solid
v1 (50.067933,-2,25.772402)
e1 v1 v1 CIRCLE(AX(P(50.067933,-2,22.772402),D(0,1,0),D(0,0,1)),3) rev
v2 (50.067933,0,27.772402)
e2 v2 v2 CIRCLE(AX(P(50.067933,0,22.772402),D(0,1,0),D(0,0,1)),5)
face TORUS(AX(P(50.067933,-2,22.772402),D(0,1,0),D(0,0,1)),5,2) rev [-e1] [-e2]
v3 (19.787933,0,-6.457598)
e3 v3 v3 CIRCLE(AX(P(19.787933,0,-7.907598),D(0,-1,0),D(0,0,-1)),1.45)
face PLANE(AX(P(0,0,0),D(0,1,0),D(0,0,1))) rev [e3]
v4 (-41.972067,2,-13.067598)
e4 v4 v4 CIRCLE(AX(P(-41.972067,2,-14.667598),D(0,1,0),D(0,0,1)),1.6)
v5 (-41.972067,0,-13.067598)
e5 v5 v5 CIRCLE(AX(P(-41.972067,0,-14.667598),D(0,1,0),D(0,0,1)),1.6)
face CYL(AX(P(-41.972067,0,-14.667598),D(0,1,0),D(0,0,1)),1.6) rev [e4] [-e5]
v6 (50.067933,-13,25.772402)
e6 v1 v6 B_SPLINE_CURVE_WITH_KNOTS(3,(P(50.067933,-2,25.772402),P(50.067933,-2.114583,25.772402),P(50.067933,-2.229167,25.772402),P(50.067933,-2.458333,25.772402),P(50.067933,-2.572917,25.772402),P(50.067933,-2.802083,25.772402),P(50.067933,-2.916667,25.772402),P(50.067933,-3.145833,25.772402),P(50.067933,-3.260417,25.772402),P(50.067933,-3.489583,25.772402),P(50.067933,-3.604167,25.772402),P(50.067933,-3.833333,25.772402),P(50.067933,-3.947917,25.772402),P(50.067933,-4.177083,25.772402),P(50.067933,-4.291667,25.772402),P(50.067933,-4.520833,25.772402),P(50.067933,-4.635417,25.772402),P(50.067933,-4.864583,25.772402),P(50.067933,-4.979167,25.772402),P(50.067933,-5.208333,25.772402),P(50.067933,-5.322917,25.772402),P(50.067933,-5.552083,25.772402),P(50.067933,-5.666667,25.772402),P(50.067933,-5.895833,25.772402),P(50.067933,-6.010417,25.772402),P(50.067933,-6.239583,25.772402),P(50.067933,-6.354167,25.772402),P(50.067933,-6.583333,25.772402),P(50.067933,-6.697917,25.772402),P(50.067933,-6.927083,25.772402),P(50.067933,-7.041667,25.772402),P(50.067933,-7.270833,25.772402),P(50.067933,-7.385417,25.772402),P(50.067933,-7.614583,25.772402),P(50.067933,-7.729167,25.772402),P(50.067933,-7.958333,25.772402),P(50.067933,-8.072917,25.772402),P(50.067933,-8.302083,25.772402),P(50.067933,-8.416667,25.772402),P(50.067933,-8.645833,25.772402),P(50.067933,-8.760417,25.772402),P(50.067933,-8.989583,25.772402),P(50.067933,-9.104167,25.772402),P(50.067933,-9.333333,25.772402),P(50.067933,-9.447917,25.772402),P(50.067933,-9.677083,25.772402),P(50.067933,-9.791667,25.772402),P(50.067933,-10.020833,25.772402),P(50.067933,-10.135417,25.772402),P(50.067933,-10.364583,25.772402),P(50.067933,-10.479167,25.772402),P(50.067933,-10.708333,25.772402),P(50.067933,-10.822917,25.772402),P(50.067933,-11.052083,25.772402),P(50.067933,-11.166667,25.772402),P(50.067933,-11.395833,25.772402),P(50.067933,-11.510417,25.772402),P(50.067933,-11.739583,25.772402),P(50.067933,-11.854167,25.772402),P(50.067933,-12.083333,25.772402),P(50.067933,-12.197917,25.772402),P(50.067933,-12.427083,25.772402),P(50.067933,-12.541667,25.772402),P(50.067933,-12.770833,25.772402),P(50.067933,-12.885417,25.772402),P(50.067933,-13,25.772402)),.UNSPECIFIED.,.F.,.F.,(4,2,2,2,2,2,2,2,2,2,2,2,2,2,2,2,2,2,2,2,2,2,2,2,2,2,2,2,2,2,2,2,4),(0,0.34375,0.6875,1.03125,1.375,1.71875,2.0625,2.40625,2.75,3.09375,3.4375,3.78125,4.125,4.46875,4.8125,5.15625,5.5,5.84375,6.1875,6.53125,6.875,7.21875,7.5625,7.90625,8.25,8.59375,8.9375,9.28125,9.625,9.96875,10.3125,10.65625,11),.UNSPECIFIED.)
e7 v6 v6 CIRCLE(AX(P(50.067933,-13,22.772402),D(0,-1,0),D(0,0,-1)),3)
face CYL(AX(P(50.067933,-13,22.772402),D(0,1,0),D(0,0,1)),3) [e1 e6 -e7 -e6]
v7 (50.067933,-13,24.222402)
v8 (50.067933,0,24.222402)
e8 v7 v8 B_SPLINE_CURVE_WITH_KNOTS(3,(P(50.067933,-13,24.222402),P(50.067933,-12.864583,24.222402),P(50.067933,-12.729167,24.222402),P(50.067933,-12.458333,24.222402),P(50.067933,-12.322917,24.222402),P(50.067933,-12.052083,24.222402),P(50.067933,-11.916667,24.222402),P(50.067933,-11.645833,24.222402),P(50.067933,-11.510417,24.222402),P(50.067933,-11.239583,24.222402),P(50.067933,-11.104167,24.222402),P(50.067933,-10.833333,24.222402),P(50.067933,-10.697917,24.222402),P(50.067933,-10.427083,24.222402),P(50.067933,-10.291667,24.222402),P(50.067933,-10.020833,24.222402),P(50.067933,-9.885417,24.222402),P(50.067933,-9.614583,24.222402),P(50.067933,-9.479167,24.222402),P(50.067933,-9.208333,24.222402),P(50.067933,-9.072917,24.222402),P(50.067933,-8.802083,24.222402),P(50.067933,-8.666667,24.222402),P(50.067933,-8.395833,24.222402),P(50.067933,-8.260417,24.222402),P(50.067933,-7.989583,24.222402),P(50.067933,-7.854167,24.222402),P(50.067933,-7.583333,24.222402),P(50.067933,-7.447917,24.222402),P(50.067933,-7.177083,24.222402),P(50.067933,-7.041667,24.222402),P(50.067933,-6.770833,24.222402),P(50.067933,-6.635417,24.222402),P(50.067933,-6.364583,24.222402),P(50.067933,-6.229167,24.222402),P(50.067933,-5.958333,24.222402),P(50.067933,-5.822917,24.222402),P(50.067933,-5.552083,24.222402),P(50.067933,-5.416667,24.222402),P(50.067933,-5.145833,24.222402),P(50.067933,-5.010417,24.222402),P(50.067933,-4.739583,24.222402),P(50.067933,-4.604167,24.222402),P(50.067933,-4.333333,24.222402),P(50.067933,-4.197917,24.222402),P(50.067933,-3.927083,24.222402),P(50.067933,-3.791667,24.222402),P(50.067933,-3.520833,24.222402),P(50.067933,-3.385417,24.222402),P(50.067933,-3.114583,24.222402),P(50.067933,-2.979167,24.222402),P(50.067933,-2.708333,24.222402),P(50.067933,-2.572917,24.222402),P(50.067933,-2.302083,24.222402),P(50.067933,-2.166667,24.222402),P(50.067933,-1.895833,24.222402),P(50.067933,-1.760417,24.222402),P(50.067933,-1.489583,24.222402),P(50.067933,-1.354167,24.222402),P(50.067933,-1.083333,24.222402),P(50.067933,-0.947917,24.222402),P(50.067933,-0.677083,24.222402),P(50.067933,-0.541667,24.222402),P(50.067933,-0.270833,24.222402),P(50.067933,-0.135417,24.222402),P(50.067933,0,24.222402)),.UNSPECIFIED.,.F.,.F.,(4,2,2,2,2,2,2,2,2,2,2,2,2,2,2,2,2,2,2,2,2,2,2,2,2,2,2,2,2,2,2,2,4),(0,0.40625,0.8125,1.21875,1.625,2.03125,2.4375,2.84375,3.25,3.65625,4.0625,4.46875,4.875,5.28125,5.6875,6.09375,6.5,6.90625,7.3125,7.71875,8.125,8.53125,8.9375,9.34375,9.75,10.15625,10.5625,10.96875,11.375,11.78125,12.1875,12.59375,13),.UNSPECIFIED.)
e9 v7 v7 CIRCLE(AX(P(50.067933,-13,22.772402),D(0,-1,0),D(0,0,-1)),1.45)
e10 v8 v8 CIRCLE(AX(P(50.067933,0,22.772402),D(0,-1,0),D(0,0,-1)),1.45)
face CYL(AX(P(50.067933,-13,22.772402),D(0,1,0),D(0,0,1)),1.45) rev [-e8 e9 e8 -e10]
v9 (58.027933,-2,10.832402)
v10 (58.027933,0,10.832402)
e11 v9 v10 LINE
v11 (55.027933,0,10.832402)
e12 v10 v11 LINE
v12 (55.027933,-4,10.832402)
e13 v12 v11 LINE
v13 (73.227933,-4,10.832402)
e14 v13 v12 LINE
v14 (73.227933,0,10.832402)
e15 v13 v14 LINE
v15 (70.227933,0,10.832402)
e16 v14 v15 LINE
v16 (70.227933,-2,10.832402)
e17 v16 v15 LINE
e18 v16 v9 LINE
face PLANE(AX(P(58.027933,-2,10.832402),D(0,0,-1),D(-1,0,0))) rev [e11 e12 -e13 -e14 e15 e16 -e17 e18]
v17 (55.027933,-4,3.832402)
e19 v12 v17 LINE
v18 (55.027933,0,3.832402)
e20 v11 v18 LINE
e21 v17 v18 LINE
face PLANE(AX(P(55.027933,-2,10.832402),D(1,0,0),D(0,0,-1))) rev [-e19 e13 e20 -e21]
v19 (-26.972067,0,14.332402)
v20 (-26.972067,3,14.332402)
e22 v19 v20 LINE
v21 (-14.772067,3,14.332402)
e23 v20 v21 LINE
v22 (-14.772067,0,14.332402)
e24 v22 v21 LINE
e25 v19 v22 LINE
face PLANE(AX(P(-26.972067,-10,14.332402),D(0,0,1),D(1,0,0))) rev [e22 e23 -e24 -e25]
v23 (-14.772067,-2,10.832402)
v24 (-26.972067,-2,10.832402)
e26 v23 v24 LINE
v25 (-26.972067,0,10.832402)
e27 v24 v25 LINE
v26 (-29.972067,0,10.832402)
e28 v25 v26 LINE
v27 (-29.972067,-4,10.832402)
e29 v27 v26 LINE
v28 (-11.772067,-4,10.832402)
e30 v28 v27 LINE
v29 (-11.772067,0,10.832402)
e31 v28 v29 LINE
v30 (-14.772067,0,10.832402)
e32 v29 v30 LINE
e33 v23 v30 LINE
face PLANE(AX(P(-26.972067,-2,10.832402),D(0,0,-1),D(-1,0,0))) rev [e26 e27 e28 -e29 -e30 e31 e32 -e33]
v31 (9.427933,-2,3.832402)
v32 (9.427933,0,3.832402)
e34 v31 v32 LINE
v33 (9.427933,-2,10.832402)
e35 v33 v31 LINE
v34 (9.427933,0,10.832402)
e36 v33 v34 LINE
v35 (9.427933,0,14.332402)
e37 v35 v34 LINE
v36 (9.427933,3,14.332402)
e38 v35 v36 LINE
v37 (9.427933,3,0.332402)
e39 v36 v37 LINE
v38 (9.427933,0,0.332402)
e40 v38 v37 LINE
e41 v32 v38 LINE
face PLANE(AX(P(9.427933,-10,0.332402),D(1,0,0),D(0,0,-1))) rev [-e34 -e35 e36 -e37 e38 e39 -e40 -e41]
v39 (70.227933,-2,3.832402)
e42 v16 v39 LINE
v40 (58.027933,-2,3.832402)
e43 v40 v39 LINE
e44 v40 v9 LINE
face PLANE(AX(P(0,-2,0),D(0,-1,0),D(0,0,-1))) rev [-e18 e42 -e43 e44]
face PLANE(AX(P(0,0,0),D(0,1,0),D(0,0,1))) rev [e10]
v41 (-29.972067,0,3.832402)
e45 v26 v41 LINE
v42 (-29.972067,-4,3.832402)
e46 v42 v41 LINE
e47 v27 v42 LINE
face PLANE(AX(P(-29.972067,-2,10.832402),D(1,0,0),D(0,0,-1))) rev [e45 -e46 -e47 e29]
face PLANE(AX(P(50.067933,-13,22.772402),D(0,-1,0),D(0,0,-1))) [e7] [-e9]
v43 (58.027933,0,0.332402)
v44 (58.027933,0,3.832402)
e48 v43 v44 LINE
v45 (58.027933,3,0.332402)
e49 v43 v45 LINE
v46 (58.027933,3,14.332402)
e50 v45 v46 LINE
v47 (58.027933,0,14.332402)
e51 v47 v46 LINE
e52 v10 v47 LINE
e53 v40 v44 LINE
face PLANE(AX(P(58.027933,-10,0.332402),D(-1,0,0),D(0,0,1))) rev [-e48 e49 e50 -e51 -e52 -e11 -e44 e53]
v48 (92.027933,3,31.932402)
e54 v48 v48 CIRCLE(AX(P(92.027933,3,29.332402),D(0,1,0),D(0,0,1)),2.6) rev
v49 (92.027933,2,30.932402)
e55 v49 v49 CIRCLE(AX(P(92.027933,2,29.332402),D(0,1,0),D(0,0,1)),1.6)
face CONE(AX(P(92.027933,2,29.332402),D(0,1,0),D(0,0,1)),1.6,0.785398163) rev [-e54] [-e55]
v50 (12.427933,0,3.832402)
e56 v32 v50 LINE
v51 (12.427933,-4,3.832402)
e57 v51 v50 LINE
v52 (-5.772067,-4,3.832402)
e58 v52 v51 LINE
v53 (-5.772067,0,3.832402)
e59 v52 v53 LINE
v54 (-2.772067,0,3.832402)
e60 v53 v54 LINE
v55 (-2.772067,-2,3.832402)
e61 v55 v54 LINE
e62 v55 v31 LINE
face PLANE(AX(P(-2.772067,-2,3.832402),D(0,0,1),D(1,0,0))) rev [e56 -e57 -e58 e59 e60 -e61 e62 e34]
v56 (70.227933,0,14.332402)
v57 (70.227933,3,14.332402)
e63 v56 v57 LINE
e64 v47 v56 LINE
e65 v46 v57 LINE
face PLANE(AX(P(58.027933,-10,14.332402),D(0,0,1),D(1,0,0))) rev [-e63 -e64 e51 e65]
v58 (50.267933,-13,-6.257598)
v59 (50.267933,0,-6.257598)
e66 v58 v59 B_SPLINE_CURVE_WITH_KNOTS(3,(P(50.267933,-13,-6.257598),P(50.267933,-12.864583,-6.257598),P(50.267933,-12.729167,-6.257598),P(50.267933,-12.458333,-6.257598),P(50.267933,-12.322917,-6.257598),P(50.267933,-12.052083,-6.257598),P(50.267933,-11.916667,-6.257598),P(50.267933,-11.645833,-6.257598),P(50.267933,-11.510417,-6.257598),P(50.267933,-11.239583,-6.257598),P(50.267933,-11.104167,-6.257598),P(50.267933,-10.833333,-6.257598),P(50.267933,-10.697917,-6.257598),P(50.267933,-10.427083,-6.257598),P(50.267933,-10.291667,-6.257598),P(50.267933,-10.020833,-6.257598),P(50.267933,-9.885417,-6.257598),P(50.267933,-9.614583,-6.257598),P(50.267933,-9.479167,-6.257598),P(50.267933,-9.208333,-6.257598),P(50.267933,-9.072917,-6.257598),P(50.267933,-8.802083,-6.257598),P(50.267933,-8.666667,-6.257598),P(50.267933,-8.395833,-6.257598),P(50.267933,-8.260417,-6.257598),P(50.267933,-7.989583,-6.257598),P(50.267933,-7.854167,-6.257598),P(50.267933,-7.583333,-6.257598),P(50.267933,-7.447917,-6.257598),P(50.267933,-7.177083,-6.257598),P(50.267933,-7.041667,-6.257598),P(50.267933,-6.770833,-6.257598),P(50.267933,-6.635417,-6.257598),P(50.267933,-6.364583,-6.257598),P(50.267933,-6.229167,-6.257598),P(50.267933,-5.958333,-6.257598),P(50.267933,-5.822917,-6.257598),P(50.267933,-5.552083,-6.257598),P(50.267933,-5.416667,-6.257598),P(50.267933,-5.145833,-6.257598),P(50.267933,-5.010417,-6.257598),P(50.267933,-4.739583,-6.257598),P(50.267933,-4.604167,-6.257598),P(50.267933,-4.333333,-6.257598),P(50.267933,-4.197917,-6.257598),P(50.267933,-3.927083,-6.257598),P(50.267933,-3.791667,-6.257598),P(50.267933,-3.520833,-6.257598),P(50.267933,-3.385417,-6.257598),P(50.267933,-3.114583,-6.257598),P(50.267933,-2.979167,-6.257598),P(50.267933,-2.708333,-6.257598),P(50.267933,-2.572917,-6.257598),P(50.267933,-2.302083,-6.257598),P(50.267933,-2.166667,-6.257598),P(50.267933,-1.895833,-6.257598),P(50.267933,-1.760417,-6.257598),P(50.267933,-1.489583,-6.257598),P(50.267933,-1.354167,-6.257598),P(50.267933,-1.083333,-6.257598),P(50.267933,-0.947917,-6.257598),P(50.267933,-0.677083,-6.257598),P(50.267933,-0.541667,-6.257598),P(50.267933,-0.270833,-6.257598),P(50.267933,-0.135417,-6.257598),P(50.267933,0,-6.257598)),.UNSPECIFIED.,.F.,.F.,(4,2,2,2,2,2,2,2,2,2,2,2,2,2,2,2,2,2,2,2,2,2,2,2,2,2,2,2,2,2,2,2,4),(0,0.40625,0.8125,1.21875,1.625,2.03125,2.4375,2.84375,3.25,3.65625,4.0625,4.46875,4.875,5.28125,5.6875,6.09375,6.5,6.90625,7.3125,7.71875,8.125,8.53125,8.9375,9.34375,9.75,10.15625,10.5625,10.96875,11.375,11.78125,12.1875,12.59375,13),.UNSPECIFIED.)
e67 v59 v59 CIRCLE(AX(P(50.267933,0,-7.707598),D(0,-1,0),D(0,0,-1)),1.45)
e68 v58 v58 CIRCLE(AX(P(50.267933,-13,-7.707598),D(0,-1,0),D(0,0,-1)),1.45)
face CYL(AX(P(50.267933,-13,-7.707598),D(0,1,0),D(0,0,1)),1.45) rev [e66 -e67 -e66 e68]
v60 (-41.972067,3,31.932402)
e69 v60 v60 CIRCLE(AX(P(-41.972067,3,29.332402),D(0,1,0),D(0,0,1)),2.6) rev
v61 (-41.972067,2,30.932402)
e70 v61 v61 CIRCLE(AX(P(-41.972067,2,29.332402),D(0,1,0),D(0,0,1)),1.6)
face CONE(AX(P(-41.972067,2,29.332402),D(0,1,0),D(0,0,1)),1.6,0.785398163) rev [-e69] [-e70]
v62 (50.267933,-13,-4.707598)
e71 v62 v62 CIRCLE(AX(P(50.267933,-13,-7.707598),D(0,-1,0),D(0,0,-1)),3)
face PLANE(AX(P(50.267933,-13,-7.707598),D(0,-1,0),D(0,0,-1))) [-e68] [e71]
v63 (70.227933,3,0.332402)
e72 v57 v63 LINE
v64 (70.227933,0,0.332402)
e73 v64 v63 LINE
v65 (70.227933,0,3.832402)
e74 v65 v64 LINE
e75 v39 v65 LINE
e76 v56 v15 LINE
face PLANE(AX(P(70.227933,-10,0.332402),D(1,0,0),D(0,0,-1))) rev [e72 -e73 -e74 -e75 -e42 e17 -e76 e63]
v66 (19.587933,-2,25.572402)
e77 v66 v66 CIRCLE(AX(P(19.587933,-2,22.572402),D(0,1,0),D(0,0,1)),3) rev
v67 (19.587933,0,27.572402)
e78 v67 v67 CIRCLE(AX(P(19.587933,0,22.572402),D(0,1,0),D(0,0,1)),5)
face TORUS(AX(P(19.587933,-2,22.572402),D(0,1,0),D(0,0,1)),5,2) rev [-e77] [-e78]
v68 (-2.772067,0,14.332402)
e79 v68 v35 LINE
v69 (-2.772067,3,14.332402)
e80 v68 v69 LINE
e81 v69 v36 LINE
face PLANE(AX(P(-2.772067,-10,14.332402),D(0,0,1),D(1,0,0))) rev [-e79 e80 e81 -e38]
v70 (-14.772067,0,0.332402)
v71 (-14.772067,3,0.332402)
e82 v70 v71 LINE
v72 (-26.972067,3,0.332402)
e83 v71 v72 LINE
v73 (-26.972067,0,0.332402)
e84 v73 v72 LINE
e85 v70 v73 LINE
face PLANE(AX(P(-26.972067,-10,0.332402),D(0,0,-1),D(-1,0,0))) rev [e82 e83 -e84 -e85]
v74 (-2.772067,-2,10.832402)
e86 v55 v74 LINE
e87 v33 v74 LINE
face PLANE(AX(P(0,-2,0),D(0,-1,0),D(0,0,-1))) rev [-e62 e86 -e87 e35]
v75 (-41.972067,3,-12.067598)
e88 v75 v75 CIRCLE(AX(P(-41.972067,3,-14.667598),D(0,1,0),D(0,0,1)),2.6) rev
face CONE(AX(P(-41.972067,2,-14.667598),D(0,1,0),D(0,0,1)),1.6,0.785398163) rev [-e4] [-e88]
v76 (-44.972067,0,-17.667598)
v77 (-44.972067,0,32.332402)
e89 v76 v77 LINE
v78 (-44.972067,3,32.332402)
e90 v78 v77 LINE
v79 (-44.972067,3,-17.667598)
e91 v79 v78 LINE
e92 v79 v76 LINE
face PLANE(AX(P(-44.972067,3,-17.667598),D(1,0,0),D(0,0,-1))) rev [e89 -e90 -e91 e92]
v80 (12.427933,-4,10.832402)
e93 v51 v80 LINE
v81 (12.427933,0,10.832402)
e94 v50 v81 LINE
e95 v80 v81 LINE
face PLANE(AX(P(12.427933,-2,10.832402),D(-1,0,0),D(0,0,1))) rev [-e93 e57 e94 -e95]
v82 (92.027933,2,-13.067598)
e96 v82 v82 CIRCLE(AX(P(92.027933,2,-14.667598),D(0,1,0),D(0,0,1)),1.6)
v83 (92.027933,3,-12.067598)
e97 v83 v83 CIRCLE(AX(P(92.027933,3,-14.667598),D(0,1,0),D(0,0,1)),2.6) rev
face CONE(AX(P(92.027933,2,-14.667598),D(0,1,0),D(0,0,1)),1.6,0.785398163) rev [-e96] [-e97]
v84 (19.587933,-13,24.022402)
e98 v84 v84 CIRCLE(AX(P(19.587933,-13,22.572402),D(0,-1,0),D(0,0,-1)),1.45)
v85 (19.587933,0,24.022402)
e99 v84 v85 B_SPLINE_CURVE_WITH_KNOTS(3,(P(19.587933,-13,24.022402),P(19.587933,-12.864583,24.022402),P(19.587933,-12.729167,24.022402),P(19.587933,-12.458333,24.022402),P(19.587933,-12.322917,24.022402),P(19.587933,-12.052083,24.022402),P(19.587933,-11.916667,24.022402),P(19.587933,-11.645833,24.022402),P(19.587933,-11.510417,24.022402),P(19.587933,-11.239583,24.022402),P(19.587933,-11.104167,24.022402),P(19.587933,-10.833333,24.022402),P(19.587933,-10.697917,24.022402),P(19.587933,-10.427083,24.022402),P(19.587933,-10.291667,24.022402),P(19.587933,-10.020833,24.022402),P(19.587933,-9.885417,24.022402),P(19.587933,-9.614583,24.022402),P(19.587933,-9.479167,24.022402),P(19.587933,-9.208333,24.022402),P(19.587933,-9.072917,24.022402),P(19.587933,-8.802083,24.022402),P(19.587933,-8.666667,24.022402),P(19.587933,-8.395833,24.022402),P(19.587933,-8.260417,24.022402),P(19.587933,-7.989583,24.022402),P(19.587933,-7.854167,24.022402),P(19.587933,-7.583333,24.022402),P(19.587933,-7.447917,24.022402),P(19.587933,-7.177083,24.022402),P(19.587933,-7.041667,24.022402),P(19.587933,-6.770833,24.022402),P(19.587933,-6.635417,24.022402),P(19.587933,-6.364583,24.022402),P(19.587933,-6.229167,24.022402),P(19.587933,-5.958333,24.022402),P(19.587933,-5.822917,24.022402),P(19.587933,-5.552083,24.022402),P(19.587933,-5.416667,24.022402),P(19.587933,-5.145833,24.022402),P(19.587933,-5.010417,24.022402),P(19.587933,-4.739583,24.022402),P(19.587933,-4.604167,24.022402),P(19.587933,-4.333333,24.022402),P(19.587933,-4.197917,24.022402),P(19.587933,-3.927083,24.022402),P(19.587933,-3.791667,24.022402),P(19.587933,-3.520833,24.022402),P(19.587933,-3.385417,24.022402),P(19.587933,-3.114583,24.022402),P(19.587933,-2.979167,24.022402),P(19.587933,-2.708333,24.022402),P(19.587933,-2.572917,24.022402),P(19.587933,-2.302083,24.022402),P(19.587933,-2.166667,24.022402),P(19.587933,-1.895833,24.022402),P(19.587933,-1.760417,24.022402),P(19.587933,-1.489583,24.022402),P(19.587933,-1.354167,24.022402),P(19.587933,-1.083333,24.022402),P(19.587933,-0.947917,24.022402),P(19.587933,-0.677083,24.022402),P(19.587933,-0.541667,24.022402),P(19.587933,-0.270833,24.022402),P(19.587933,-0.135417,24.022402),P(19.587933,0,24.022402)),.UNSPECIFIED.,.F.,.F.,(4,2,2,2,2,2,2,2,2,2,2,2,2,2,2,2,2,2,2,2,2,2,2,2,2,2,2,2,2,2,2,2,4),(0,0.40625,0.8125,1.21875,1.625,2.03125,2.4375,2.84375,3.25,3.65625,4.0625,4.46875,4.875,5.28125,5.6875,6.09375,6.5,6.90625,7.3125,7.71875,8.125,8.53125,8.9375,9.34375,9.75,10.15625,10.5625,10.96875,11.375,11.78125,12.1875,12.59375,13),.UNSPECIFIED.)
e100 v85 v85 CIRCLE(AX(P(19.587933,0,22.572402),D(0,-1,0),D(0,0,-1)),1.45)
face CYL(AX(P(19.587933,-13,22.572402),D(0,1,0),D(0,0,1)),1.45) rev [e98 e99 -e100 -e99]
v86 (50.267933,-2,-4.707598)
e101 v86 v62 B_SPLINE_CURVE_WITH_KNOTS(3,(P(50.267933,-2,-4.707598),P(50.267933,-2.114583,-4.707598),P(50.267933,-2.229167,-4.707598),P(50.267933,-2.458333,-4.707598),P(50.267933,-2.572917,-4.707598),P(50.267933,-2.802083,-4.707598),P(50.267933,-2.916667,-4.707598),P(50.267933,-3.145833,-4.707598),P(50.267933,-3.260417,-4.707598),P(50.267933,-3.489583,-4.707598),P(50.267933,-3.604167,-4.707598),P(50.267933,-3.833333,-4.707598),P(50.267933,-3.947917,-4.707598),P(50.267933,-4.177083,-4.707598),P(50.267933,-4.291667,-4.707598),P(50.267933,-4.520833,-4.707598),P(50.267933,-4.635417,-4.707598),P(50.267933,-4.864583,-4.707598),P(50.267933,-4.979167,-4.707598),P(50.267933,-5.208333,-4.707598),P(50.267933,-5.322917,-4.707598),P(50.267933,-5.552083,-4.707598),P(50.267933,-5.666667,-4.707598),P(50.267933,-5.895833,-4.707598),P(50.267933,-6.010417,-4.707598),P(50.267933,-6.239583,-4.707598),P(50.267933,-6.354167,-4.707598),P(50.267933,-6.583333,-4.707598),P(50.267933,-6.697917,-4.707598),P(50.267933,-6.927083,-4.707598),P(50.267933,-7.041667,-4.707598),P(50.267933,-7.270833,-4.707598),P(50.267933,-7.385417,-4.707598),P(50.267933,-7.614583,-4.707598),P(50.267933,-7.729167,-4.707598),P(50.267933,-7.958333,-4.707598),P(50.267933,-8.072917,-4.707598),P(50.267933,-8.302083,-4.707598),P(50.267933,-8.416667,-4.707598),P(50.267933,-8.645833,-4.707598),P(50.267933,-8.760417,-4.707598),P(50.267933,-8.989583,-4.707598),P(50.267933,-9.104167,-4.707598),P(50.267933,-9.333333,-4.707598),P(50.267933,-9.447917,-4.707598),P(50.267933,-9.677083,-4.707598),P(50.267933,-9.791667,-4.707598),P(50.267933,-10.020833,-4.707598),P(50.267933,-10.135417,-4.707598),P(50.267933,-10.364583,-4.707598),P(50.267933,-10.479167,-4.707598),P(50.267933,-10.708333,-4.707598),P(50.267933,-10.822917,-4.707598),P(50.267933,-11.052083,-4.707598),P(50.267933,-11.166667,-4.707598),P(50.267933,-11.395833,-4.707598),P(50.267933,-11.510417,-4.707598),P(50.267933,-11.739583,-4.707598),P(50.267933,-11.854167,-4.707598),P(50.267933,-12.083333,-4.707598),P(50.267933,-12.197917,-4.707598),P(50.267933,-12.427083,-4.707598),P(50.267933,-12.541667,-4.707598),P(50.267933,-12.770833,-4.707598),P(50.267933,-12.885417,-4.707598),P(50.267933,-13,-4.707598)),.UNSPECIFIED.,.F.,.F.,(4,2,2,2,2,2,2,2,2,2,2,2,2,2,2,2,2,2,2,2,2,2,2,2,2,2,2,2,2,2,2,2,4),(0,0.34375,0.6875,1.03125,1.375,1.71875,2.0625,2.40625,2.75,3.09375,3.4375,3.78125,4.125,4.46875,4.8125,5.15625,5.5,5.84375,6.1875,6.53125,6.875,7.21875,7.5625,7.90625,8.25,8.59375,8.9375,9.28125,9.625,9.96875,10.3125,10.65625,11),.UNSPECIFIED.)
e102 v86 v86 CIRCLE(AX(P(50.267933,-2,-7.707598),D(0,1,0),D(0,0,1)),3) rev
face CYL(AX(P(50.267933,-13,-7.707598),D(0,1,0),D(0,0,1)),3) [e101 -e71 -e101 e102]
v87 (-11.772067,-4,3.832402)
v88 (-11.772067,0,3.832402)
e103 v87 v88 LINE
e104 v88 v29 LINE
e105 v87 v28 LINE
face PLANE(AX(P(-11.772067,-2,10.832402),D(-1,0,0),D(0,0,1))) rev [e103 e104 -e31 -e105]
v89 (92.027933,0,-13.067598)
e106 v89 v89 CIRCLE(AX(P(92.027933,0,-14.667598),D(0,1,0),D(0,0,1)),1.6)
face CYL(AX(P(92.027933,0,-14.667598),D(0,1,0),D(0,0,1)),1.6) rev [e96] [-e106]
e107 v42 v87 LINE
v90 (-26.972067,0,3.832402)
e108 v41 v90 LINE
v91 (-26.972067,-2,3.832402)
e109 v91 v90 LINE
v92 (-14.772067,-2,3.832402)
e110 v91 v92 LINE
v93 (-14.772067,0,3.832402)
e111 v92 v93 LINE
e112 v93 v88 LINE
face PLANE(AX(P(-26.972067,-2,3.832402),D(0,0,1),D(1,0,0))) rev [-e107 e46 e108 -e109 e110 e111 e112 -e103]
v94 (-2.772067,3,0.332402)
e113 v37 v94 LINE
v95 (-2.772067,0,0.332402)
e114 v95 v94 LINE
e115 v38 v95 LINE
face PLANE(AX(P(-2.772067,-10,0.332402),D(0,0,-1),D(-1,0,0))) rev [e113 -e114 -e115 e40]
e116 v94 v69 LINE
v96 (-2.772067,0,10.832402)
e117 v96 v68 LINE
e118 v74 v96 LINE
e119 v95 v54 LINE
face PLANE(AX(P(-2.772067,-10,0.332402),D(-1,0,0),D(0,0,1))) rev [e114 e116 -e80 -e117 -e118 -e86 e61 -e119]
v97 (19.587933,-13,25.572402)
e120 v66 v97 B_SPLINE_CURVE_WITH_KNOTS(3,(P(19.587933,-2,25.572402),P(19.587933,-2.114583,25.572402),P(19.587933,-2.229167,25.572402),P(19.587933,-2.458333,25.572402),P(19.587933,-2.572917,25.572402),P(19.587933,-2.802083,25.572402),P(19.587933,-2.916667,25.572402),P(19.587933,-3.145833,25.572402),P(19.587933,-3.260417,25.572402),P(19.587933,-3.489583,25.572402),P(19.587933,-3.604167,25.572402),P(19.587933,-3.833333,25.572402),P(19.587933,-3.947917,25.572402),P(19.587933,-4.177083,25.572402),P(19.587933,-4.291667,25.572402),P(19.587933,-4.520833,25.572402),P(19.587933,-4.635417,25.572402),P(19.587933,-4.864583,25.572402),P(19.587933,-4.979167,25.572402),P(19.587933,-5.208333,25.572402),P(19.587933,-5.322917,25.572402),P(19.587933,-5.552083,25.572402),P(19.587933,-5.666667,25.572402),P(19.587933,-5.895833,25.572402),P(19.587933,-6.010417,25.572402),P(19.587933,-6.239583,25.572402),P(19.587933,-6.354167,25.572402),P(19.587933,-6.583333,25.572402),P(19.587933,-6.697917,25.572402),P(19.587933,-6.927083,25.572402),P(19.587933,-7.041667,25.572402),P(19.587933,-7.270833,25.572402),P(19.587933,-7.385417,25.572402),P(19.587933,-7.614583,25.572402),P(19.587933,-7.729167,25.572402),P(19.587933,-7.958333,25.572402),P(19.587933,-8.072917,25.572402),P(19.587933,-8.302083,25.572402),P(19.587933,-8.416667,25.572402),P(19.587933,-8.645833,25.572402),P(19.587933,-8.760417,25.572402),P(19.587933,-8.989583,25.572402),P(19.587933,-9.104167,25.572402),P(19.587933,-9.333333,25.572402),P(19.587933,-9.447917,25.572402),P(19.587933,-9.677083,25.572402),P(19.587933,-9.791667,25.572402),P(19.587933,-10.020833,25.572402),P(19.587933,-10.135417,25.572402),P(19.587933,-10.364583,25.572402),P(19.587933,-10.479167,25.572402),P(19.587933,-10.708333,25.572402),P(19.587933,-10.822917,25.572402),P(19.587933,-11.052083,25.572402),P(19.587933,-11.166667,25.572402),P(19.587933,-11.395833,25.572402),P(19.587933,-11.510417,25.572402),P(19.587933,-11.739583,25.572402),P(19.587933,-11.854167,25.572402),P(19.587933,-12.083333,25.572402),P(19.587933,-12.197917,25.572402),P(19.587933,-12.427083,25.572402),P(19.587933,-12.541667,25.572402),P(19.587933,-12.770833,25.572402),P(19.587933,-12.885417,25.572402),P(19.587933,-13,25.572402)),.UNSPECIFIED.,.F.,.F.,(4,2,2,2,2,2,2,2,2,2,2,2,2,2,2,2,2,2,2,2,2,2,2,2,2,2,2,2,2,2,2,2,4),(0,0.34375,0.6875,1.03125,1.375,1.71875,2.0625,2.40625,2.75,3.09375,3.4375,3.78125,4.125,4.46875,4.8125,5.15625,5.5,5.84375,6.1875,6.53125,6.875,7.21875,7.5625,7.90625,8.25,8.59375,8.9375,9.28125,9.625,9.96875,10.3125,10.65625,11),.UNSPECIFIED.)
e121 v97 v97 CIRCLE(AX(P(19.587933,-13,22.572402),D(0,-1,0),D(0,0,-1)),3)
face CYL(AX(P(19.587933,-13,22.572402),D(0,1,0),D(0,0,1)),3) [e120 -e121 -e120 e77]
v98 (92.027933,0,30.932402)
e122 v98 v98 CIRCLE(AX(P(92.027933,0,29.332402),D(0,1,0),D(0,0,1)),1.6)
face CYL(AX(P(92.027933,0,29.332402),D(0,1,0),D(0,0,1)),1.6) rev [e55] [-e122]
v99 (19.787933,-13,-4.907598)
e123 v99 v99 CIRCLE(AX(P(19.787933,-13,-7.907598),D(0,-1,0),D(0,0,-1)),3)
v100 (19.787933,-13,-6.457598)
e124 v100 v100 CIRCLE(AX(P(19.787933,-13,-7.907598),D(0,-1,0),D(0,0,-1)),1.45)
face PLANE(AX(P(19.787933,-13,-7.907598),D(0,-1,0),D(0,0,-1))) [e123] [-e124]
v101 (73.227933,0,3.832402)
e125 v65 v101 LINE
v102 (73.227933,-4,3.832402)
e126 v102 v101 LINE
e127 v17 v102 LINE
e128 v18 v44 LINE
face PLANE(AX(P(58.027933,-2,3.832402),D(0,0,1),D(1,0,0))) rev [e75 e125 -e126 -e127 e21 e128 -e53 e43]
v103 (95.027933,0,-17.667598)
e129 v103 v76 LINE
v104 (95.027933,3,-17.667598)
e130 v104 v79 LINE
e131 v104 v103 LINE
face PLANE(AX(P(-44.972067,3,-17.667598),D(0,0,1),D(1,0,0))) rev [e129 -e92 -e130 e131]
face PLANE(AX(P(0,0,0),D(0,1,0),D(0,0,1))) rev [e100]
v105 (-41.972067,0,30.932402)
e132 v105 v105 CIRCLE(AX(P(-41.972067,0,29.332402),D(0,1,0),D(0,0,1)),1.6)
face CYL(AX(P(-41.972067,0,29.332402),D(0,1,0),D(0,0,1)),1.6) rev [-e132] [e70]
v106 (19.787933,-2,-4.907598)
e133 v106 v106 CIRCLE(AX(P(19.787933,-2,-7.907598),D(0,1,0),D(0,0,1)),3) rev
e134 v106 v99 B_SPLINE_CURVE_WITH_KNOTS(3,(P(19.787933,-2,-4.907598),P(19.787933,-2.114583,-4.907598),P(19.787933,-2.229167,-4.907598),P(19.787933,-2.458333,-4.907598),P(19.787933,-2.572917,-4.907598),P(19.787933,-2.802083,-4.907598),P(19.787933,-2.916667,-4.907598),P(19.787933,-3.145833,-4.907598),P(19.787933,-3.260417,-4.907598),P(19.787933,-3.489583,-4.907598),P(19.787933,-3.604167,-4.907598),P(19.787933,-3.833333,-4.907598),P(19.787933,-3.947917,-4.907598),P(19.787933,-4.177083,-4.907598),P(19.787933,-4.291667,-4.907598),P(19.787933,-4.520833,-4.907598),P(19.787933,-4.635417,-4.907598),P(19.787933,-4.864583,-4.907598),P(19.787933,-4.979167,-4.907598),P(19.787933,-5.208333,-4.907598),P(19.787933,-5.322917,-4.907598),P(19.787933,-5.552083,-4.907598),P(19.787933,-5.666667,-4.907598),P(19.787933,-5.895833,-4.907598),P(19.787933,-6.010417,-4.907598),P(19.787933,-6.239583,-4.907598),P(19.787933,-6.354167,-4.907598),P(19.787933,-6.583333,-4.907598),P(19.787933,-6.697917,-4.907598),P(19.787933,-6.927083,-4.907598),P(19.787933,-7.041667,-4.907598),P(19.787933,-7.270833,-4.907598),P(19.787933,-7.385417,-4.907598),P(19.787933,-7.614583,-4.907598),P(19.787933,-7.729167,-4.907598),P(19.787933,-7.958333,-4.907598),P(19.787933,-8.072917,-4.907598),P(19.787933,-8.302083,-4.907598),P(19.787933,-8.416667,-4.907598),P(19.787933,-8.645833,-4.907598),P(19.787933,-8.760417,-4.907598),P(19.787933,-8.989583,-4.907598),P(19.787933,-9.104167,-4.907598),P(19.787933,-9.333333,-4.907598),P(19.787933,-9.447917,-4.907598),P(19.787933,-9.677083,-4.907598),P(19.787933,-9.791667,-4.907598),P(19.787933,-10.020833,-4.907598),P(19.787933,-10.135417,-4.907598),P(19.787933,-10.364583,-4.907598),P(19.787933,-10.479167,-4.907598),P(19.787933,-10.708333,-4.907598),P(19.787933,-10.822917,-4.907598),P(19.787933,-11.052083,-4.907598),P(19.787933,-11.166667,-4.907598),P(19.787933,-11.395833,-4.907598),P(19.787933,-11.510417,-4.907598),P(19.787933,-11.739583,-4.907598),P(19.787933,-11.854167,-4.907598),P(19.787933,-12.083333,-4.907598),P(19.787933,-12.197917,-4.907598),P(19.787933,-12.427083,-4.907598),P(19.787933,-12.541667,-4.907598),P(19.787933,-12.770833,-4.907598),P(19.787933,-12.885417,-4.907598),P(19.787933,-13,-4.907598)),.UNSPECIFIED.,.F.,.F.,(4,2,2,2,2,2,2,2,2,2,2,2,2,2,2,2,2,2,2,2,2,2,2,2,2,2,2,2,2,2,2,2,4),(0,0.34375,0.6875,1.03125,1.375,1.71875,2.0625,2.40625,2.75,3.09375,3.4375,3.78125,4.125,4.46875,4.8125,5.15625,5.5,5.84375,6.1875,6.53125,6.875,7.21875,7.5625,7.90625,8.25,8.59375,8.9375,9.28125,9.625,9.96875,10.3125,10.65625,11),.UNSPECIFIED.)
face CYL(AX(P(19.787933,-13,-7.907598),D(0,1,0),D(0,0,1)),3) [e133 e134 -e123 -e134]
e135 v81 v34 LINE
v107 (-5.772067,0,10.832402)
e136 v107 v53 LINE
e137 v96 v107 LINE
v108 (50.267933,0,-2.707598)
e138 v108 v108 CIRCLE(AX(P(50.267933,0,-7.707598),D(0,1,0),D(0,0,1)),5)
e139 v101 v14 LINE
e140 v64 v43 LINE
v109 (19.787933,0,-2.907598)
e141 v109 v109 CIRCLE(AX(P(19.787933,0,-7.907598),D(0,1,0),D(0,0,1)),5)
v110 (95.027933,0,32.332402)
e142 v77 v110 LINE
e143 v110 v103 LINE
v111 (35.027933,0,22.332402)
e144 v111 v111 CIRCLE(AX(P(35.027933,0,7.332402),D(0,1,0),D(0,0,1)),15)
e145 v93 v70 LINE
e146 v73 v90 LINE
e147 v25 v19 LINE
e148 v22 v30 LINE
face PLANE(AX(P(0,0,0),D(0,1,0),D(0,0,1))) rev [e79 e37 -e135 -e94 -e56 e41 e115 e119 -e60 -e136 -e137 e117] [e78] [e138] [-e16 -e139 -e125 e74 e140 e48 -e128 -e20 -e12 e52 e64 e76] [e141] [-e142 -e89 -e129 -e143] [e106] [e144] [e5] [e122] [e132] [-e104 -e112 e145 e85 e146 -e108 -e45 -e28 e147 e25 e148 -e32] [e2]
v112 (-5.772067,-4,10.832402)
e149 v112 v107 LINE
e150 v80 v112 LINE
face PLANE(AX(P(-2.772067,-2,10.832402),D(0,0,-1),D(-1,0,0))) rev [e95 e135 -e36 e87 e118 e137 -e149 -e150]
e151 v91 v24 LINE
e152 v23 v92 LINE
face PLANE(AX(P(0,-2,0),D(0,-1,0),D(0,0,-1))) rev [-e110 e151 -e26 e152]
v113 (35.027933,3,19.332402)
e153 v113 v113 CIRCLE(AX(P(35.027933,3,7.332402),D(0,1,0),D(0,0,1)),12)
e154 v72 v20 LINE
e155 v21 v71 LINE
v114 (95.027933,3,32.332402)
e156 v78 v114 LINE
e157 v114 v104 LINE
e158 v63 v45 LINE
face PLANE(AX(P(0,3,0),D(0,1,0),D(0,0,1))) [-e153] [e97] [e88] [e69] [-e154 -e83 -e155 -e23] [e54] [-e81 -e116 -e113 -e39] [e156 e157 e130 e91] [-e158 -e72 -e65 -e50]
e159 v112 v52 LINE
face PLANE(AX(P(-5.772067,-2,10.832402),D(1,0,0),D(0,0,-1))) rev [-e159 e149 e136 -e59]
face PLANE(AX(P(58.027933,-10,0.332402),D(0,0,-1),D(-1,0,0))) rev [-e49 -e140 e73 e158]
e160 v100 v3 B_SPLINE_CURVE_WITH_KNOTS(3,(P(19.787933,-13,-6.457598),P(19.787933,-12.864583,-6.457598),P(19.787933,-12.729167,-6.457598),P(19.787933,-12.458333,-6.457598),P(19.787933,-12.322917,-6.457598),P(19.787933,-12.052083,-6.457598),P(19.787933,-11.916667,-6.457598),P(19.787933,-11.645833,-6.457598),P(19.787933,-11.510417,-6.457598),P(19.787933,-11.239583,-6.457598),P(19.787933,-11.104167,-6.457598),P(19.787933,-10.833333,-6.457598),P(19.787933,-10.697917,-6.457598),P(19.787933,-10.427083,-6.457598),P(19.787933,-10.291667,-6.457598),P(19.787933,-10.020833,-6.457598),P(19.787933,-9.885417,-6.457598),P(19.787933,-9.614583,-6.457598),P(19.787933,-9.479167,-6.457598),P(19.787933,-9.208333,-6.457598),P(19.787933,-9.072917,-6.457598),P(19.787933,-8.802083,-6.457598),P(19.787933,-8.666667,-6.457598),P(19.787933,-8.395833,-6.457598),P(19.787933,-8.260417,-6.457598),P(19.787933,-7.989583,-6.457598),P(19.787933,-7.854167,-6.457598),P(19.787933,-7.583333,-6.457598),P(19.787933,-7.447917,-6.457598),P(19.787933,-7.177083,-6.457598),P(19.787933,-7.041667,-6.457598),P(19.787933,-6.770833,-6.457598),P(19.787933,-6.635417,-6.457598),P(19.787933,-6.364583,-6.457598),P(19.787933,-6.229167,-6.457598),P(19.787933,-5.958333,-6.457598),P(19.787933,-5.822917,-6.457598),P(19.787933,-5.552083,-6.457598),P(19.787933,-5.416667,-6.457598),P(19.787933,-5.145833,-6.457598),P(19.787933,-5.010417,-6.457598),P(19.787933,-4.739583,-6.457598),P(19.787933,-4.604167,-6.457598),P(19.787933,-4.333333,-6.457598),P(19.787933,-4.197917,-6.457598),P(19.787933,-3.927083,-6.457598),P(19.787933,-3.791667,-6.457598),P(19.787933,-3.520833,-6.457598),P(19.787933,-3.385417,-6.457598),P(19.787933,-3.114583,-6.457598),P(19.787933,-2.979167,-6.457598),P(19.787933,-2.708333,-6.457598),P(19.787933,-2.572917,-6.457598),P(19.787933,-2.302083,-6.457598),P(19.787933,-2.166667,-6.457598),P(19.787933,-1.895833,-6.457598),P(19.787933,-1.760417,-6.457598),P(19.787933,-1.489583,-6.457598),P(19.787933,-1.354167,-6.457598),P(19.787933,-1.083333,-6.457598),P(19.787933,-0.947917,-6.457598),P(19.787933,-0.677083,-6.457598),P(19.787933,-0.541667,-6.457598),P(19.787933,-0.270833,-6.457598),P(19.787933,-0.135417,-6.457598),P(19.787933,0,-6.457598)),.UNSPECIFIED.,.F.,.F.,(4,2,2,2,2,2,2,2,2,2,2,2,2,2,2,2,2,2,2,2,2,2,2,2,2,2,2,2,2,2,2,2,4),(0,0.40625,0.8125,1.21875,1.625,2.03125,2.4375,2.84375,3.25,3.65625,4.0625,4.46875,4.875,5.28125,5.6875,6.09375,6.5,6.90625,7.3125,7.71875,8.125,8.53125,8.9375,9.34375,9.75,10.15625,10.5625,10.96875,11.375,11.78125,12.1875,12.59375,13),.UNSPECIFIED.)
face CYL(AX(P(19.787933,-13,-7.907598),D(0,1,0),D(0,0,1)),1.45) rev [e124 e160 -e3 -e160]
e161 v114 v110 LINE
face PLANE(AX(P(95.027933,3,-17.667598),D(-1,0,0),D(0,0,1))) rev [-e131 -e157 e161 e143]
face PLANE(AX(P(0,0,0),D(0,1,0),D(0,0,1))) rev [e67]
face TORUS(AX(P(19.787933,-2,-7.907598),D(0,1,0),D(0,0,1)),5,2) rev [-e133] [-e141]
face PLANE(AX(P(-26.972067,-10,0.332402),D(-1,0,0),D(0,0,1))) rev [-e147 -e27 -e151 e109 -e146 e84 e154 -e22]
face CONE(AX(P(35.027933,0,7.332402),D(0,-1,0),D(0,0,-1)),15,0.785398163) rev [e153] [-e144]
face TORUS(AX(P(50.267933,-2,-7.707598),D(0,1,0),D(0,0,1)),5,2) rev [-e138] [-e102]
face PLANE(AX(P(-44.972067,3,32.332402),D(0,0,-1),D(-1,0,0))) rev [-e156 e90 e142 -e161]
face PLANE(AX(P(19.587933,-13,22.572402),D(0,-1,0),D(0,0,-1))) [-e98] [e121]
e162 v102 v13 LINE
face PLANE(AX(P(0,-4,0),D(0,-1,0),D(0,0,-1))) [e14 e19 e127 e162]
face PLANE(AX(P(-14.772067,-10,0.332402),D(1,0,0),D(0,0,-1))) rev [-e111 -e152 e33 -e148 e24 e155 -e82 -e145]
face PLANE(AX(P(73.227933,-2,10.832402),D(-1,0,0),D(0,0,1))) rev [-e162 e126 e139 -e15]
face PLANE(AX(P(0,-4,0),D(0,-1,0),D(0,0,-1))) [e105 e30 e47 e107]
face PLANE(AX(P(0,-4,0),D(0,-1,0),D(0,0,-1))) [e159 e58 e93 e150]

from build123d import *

# Parameters (mm, degrees)
SKETCH1_W           = 140
SKETCH1_H           = 50
BOSS_EXTRUDE1_DEPTH = 3
SKETCH2_R           = 1.6
CUT_EXTRUDE1_DEPTH  = 3
SKETCH3_R           = 12
CUT_EXTRUDE2_DEPTH  = 3
CHAMFER1_SIZE       = 1
CHAMFER2_SIZE       = 3
SKETCH4_R           = 3
SKETCH4_R_2         = 1.45
BOSS_EXTRUDE2_DEPTH = 13
FILLET1_R           = 2
SKETCH5_W           = 12.2
SKETCH5_H           = 14
CUT_EXTRUDE3_DEPTH  = 13
SKETCH6_W           = 3
SKETCH6_H           = 7
BOSS_EXTRUDE3_DEPTH = 2
SKETCH7_W           = 18.2
SKETCH7_H           = 7
BOSS_EXTRUDE4_DEPTH = 2


with BuildPart() as part:
    # Sketch1 → Boss-Extrude1 (new body)
    with BuildSketch(Plane(origin=(0, 0, 0), x_dir=(1, 0, 0), z_dir=(0, 1, 0))):
        with Locations((25.027932961, -7.332402235)):
            Rectangle(SKETCH1_W, SKETCH1_H)
    extrude(amount=BOSS_EXTRUDE1_DEPTH)

    # Sketch2 → Cut-Extrude1 (cut)
    with BuildSketch(Plane(origin=(0, 3, 0), x_dir=(1, 0, 0), z_dir=(0, 1, 0))):
        with Locations(Location((-41.972067039, 14.667597765, 0), (0, 0, 270))):
            Circle(SKETCH2_R)
        with Locations(Location((92.027932961, 14.667597765, 0), (0, 0, 270))):
            Circle(SKETCH2_R)
        with Locations(Location((-41.972067039, -29.332402235, 0), (0, 0, 270))):
            Circle(SKETCH2_R)
        with Locations(Location((92.027932961, -29.332402235, 0), (0, 0, 270))):
            Circle(SKETCH2_R)
    extrude(amount=-CUT_EXTRUDE1_DEPTH, mode=Mode.SUBTRACT)

    # Sketch3 → Cut-Extrude2 (cut)
    with BuildSketch(Plane(origin=(0, 3, 0), x_dir=(1, 0, 0), z_dir=(0, 1, 0))):
        with Locations(Location((35.027932961, -7.332402235, 0), (0, 0, 270))):
            Circle(SKETCH3_R)
    extrude(amount=-CUT_EXTRUDE2_DEPTH, mode=Mode.SUBTRACT)

    # Chamfer1
    chamfer1_edges = [part.edges().sort_by_distance(p)[0] for p in [
        (92.027932961, 3, -16.267597765),
        (-41.972067039, 3, 27.732402235),
        (92.027932961, 3, 27.732402235),
        (-41.972067039, 3, -16.267597765),
    ]]
    chamfer(chamfer1_edges, length=CHAMFER1_SIZE)

    # Chamfer2
    chamfer2_edges = [part.edges().sort_by_distance(p)[0] for p in [
        (35.027932961, 0, -4.667597765),
    ]]
    chamfer(chamfer2_edges, length=CHAMFER2_SIZE - 0.0001)  # a hair under: the kernel refuses the full size

    # Sketch4 → Boss-Extrude2 (add)
    # profile 1 of 4: a face of its own
    with BuildSketch(Plane.XZ):
        with Locations(Location((19.787932961, -7.907597765, 0), (0, 0, 90))):
            Circle(SKETCH4_R)
        with Locations(Location((19.787932961, -7.907597765, 0), (0, 0, 90))):
            Circle(SKETCH4_R_2, mode=Mode.SUBTRACT)
    # profile 2 of 4: a face of its own
    with BuildSketch(Plane.XZ):
        with Locations(Location((19.587932961, 22.572402235, 0), (0, 0, 90))):
            Circle(SKETCH4_R)
        with Locations(Location((19.587932961, 22.572402235, 0), (0, 0, 90))):
            Circle(SKETCH4_R_2, mode=Mode.SUBTRACT)
    # profile 3 of 4: a face of its own
    with BuildSketch(Plane.XZ):
        with Locations(Location((50.067932961, 22.772402235, 0), (0, 0, 90))):
            Circle(SKETCH4_R)
        with Locations(Location((50.067932961, 22.772402235, 0), (0, 0, 90))):
            Circle(SKETCH4_R_2, mode=Mode.SUBTRACT)
    # profile 4 of 4: a face of its own
    with BuildSketch(Plane.XZ):
        with Locations(Location((50.267932961, -7.707597765, 0), (0, 0, 90))):
            Circle(SKETCH4_R)
        with Locations(Location((50.267932961, -7.707597765, 0), (0, 0, 90))):
            Circle(SKETCH4_R_2, mode=Mode.SUBTRACT)
    extrude(amount=BOSS_EXTRUDE2_DEPTH)

    # Fillet1
    fillet1_edges = [part.edges().sort_by_distance(p)[0] for p in [
        (19.787932961, 0, -10.907597765),
        (19.587932961, 0, 19.572402235),
        (50.067932961, 0, 19.772402235),
        (50.267932961, 0, -10.707597765),
    ]]
    fillet(fillet1_edges, radius=FILLET1_R)

    # Sketch5 → Cut-Extrude3 (cut)
    with BuildSketch(Plane(origin=(0, 3, 0), x_dir=(1, 0, 0), z_dir=(0, 1, 0))):
        with Locations((-20.872067039, -7.332402235)):
            Rectangle(SKETCH5_W, SKETCH5_H)
        with Locations((3.327932961, -7.332402235)):
            Rectangle(SKETCH5_W, SKETCH5_H)
        with Locations((64.127932961, -7.332402235)):
            Rectangle(SKETCH5_W, SKETCH5_H)
    extrude(amount=-CUT_EXTRUDE3_DEPTH, mode=Mode.SUBTRACT)

    # Sketch6 → Boss-Extrude3 (add)
    with BuildSketch(Plane.XZ):
        with Locations((-28.472067039, 7.332402235)):
            Rectangle(SKETCH6_W, SKETCH6_H)
        with Locations((-13.272067039, 7.332402235)):
            Rectangle(SKETCH6_W, SKETCH6_H)
        with Locations((-4.272067039, 7.332402235)):
            Rectangle(SKETCH6_W, SKETCH6_H)
        with Locations((10.927932961, 7.332402235)):
            Rectangle(SKETCH6_W, SKETCH6_H)
        with Locations((56.527932961, 7.332402235)):
            Rectangle(SKETCH6_W, SKETCH6_H)
        with Locations((71.727932961, 7.332402235)):
            Rectangle(SKETCH6_W, SKETCH6_H)
    extrude(amount=BOSS_EXTRUDE3_DEPTH)

    # Sketch7 → Boss-Extrude4 (add)
    with BuildSketch(Plane.XZ.offset(2)):
        with Locations((-20.872067039, 7.332402235)):
            Rectangle(SKETCH7_W, SKETCH7_H)
        with Locations((3.327932961, 7.332402235)):
            Rectangle(SKETCH7_W, SKETCH7_H)
        with Locations((64.127932961, 7.332402235)):
            Rectangle(SKETCH7_W, SKETCH7_H)
    extrude(amount=BOSS_EXTRUDE4_DEPTH)


solid = part.part
